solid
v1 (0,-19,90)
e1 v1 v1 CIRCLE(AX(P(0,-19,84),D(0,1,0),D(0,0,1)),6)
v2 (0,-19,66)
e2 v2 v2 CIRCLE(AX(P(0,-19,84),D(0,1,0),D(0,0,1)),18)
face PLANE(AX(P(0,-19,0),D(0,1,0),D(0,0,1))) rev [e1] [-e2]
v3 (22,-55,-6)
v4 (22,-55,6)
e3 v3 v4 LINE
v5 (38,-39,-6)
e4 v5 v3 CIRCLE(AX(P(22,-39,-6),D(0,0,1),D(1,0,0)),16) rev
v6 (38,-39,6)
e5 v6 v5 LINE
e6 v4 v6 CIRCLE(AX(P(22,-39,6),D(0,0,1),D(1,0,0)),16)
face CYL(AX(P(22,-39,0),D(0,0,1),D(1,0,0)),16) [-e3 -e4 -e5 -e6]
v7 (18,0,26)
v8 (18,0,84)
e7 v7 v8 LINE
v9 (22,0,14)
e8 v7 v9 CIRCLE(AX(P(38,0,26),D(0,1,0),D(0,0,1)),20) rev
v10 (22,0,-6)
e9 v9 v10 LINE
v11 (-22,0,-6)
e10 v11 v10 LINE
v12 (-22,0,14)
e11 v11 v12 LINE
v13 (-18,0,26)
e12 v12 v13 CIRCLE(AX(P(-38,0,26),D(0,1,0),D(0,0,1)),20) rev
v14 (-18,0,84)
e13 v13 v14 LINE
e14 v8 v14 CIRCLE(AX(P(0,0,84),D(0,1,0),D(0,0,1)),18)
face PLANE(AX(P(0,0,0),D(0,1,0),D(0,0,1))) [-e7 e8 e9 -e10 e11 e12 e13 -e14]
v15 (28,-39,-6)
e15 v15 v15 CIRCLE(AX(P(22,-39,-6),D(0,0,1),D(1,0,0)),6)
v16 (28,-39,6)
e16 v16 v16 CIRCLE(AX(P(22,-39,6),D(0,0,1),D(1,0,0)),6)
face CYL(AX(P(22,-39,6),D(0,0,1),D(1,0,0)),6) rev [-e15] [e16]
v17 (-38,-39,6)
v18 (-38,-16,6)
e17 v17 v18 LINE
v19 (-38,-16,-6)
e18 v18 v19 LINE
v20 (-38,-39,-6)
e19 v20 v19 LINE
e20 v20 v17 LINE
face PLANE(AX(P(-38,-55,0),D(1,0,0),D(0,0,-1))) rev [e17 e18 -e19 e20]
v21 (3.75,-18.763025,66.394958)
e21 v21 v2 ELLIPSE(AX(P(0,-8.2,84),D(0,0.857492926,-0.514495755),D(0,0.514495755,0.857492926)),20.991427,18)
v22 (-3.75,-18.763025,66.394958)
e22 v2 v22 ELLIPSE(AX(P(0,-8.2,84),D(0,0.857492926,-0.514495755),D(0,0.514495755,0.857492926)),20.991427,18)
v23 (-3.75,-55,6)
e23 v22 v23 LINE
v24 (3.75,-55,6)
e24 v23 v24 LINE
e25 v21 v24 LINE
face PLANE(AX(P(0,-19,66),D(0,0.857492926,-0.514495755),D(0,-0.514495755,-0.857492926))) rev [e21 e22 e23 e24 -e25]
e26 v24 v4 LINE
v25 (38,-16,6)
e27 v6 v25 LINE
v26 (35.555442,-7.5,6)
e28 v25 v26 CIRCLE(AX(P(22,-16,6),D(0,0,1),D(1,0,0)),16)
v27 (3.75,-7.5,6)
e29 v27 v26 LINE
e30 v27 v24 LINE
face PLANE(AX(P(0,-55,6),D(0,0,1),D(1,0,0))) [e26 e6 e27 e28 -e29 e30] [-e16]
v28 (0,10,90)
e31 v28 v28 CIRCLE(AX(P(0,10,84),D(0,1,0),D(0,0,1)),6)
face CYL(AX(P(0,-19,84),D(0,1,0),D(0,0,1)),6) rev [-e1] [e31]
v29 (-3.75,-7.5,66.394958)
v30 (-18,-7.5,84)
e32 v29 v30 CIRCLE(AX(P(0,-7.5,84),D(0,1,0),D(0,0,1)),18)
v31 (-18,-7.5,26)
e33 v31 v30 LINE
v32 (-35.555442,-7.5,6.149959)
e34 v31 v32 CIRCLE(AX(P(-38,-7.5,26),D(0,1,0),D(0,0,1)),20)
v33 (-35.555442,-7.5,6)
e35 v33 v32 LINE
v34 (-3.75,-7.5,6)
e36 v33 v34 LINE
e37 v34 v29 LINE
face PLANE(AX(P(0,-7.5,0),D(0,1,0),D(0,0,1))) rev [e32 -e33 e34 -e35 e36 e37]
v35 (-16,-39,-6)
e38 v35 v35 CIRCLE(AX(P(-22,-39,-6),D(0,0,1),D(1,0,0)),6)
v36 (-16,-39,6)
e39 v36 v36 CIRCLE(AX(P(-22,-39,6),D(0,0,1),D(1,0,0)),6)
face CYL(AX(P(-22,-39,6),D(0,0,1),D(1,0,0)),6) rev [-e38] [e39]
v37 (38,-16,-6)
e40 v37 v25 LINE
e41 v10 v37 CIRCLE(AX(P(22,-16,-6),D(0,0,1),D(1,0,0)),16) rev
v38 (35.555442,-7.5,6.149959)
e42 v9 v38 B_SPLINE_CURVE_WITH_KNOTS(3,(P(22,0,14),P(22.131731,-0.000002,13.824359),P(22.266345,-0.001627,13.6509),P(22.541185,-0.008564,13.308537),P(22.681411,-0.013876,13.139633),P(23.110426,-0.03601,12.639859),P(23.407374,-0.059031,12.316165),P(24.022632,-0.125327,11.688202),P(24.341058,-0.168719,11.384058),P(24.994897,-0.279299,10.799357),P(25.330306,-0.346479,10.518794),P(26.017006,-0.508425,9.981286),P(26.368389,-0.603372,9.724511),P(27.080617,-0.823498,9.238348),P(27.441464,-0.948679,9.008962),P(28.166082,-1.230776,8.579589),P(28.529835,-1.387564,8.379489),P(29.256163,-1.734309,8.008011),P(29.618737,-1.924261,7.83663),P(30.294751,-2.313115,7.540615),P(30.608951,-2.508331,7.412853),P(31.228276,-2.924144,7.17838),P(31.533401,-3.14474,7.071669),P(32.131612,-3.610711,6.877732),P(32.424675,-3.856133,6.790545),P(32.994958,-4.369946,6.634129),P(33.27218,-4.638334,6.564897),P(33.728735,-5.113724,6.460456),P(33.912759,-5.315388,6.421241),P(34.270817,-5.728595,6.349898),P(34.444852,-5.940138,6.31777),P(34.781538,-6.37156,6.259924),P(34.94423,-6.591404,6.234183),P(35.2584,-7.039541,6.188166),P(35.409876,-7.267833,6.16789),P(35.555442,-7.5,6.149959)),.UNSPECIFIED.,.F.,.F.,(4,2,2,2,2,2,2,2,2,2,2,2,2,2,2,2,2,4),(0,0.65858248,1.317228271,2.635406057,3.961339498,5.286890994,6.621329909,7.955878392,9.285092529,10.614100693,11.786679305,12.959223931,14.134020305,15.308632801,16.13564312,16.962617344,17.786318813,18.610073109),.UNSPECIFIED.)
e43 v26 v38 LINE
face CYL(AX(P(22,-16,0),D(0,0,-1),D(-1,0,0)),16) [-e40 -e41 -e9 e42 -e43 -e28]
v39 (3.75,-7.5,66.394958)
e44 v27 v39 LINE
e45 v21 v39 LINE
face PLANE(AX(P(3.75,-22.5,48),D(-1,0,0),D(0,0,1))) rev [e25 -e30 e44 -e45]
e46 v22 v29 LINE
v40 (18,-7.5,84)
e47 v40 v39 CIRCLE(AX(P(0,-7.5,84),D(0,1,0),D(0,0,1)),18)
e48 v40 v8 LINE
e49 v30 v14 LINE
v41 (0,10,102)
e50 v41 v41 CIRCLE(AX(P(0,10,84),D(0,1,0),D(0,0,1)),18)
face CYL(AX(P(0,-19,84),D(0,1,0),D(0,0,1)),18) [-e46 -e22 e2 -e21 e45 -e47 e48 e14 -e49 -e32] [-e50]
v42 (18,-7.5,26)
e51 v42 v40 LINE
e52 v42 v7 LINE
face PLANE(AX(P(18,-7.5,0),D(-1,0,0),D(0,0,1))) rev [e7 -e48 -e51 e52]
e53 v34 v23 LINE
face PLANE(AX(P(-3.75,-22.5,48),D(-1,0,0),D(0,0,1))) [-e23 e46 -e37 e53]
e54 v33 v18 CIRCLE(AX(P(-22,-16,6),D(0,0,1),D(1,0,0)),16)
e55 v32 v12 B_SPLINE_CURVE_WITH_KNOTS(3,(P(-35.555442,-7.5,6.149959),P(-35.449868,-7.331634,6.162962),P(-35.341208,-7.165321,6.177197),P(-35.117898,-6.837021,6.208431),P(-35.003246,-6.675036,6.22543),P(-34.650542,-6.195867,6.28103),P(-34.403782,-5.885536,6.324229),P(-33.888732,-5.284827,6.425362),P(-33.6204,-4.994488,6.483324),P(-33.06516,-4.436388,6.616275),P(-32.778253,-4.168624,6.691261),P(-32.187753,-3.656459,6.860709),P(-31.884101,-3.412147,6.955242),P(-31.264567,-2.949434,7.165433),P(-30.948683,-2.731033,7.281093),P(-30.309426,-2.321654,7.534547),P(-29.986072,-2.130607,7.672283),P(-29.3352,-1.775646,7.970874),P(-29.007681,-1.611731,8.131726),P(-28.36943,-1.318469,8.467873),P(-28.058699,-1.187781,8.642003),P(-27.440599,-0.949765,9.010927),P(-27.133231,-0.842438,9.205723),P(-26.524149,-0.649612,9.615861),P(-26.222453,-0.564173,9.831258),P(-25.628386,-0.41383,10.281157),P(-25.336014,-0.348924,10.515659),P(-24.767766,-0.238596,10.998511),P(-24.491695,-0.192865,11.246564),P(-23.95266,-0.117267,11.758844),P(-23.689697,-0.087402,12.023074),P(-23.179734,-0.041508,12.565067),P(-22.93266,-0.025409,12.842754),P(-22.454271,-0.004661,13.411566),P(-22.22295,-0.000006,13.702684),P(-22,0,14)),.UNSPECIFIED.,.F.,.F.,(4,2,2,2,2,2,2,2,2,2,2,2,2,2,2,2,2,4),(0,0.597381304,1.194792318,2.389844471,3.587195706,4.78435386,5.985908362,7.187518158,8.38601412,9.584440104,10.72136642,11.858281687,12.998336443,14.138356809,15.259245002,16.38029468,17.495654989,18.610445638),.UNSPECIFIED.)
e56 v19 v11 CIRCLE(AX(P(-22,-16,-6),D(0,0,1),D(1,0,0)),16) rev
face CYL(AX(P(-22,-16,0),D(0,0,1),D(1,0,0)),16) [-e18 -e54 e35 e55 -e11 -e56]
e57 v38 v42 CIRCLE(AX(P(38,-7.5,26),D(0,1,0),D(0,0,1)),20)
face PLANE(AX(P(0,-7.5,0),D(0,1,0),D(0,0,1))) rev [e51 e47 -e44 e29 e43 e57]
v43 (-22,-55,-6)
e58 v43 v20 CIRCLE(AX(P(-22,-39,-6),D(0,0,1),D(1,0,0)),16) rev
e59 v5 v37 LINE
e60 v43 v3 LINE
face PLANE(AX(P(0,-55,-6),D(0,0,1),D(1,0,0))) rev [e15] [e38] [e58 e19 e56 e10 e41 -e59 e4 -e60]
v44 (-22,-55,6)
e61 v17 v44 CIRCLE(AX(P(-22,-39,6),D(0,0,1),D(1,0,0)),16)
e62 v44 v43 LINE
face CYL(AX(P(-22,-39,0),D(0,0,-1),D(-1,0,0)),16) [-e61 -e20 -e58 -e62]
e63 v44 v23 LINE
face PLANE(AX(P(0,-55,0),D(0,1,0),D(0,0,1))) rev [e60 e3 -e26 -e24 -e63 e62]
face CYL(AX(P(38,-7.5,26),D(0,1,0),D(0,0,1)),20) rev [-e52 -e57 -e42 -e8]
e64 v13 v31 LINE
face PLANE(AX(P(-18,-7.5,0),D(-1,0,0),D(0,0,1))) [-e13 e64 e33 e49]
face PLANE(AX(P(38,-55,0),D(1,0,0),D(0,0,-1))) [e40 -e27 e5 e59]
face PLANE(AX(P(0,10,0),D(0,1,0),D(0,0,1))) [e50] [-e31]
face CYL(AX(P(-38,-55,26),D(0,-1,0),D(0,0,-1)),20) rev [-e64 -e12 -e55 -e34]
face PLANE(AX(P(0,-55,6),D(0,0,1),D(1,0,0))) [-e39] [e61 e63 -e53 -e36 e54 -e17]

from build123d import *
from build123d.topology import SkipClean

# Parameters (mm, degrees)
SKETCH2_W                = 76
SKETCH2_H                = 12
BOSS_EXTRUDE1_DEPTH      = 55
BOSS_EXTRUDE2_DEPTH      = 7.5
BOSS_EXTRUDE3_DEPTH      = 10
BOSS_EXTRUDE3_DEPTH_BACK = 19
FILLET1_R                = 16
F_12_0MM_DOWEL_HOLE1_D   = 12
RIB1_START               = -3.75
RIB1_DEPTH               = 7.5
FILLET2_START            = 6
FILLET2_DEPTH            = 0.149958722
FILLET2_START_2          = 6.149958722
FILLET2_2_DEPTH          = 19.850041378
FILLET2_START_3          = -7.500000001
FILLET2_3_DEPTH          = 8.500000001


with BuildPart() as part:
    # Sketch2 → Boss-Extrude1 (new body)
    with BuildSketch(Plane(origin=(0, 0, 0), x_dir=(1, 0, 0), z_dir=(0, 1, 0))):
        Rectangle(SKETCH2_W, SKETCH2_H)
    extrude(amount=-BOSS_EXTRUDE1_DEPTH)

    # Sketch2<3> → Boss-Extrude2 (add)
    with BuildSketch(Plane(origin=(0, 0, 0), x_dir=(1, 0, 0), z_dir=(0, 1, 0))):
        with BuildLine():
            Line((18, -6), (-18, -6))
            Line((-18, -6), (-18, -84))
            ThreePointArc((-18, -84), (0, -66), (18, -84))
            Line((18, -84), (18, -6))
        make_face()
    extrude(amount=-BOSS_EXTRUDE2_DEPTH)

    # Sketch2<4> → Boss-Extrude3 (add, two sides: drawn at the far end of the back side and taken through both)
    with BuildSketch(Plane(origin=(0, 0, 0), x_dir=(1, 0, 0), z_dir=(0, 1, 0)).offset(-BOSS_EXTRUDE3_DEPTH_BACK)):
        with BuildLine():
            ThreePointArc((18, -84), (0, -66), (-18, -84))
            Line((-18, -84), (-6, -84))
            ThreePointArc((-6, -84), (0, -78), (6, -84))
            Line((6, -84), (18, -84))
        make_face()
        with BuildLine():
            Line((-6, -84), (-18, -84))
            ThreePointArc((-18, -84), (0, -102), (18, -84))
            Line((18, -84), (6, -84))
            ThreePointArc((6, -84), (0, -90), (-6, -84))
        make_face()
    extrude(amount=BOSS_EXTRUDE3_DEPTH + BOSS_EXTRUDE3_DEPTH_BACK)

    # Fillet1
    fillet1_edges = [part.edges().sort_by_distance(p)[0] for p in [
        (38, -55, 0),
        (-38, -55, 0),
        (-38, 0, 0),
        (38, 0, 0),
    ]]
    fillet(fillet1_edges, radius=FILLET1_R)

    # Ø12.0mm Dowel Hole1 (through all)
    with Locations(Plane.XY.offset(6)):
        with Locations((-22, -39), (22, -39)):
            Hole(F_12_0MM_DOWEL_HOLE1_D / 2)

    # Rib1: read off the stored shape, not the designer's step
    # Rib1 outline → Rib1 (add)
    with SkipClean():  # the faces are left unmerged after this step: merging them gives an invalid solid
        with BuildSketch(Plane.ZY.offset(RIB1_START)):
            Polygon((6, -55), (66.394958109, -18.763025135), (68, -17.8), (68, -7.5), (6, -7.5), align=None)
        extrude(amount=RIB1_DEPTH)

    # Fillet2: read off the stored shape, not the designer's step
    # Fillet2 outline → Fillet2 (add)
    with SkipClean():  # the faces are left unmerged after this step: merging them gives an invalid solid
        with BuildSketch(Plane.XY.offset(FILLET2_START)):
            with BuildLine():
                Line((-18, -7.5), (-18, 0))
                Line((-18, 0), (-22, 0))
                ThreePointArc((-22, 0), (-29.745966692, -2), (-35.555441712, -7.5))
                Line((-35.555441712, -7.5), (-18, -7.5))
            make_face()
            with BuildLine():
                Line((18, -7.5), (35.555441712, -7.5))
                ThreePointArc((35.555441712, -7.5), (29.745966692, -2), (22, 0))
                Line((22, 0), (18, 0))
                Line((18, 0), (18, -7.5))
            make_face()
        extrude(amount=FILLET2_DEPTH)

    # Fillet2 2 outline → Fillet2 2 (add)
    with SkipClean():  # the faces are left unmerged after this step: merging them gives an invalid solid
        with BuildSketch(Plane.XY.offset(FILLET2_START_2)):
            with BuildLine():
                Line((-18, -7.5), (-18, 0))
                Line((-18, 0), (-22, 0))
                ThreePointArc((-22, 0), (-29.745966693, -2), (-35.555441712, -7.500000001))
                Line((-35.555441712, -7.500000001), (-18, -7.5))
            make_face()
            with BuildLine():
                Line((18, -7.5), (35.555441712, -7.5))
                ThreePointArc((35.555441712, -7.5), (29.745966692, -2), (22, 0))
                Line((22, 0), (18, 0))
                Line((18, 0), (18, -7.5))
            make_face()
        extrude(amount=FILLET2_2_DEPTH)

    # Fillet2 3 outline → Fillet2 3 (cut)
    with SkipClean():  # the faces are left unmerged after this step: merging them gives an invalid solid
        with BuildSketch(Plane(origin=(0, 0, 0), x_dir=(1, 0, 0), z_dir=(0, 1, 0)).offset(FILLET2_START_3)):
            with BuildLine():
                Line((37, -5.972059597), (35.555441712, -6.149958822))
                ThreePointArc((35.555441712, -6.149958822), (23.018491969, -12.750305018), (18, -26))
                Line((18, -26), (37, -26.0000001))
                Line((37, -26.0000001), (37, -5.972059597))
            make_face()
            with BuildLine():
                Line((-35.555441712, -6.149958822), (-37, -5.972059597))
                Line((-37, -5.972059597), (-37, -26.0000001))
                Line((-37, -26.0000001), (-18, -26))
                ThreePointArc((-18, -26), (-23.018491969, -12.750305018), (-35.555441712, -6.149958822))
            make_face()
        extrude(amount=FILLET2_3_DEPTH, mode=Mode.SUBTRACT)


solid = part.part
